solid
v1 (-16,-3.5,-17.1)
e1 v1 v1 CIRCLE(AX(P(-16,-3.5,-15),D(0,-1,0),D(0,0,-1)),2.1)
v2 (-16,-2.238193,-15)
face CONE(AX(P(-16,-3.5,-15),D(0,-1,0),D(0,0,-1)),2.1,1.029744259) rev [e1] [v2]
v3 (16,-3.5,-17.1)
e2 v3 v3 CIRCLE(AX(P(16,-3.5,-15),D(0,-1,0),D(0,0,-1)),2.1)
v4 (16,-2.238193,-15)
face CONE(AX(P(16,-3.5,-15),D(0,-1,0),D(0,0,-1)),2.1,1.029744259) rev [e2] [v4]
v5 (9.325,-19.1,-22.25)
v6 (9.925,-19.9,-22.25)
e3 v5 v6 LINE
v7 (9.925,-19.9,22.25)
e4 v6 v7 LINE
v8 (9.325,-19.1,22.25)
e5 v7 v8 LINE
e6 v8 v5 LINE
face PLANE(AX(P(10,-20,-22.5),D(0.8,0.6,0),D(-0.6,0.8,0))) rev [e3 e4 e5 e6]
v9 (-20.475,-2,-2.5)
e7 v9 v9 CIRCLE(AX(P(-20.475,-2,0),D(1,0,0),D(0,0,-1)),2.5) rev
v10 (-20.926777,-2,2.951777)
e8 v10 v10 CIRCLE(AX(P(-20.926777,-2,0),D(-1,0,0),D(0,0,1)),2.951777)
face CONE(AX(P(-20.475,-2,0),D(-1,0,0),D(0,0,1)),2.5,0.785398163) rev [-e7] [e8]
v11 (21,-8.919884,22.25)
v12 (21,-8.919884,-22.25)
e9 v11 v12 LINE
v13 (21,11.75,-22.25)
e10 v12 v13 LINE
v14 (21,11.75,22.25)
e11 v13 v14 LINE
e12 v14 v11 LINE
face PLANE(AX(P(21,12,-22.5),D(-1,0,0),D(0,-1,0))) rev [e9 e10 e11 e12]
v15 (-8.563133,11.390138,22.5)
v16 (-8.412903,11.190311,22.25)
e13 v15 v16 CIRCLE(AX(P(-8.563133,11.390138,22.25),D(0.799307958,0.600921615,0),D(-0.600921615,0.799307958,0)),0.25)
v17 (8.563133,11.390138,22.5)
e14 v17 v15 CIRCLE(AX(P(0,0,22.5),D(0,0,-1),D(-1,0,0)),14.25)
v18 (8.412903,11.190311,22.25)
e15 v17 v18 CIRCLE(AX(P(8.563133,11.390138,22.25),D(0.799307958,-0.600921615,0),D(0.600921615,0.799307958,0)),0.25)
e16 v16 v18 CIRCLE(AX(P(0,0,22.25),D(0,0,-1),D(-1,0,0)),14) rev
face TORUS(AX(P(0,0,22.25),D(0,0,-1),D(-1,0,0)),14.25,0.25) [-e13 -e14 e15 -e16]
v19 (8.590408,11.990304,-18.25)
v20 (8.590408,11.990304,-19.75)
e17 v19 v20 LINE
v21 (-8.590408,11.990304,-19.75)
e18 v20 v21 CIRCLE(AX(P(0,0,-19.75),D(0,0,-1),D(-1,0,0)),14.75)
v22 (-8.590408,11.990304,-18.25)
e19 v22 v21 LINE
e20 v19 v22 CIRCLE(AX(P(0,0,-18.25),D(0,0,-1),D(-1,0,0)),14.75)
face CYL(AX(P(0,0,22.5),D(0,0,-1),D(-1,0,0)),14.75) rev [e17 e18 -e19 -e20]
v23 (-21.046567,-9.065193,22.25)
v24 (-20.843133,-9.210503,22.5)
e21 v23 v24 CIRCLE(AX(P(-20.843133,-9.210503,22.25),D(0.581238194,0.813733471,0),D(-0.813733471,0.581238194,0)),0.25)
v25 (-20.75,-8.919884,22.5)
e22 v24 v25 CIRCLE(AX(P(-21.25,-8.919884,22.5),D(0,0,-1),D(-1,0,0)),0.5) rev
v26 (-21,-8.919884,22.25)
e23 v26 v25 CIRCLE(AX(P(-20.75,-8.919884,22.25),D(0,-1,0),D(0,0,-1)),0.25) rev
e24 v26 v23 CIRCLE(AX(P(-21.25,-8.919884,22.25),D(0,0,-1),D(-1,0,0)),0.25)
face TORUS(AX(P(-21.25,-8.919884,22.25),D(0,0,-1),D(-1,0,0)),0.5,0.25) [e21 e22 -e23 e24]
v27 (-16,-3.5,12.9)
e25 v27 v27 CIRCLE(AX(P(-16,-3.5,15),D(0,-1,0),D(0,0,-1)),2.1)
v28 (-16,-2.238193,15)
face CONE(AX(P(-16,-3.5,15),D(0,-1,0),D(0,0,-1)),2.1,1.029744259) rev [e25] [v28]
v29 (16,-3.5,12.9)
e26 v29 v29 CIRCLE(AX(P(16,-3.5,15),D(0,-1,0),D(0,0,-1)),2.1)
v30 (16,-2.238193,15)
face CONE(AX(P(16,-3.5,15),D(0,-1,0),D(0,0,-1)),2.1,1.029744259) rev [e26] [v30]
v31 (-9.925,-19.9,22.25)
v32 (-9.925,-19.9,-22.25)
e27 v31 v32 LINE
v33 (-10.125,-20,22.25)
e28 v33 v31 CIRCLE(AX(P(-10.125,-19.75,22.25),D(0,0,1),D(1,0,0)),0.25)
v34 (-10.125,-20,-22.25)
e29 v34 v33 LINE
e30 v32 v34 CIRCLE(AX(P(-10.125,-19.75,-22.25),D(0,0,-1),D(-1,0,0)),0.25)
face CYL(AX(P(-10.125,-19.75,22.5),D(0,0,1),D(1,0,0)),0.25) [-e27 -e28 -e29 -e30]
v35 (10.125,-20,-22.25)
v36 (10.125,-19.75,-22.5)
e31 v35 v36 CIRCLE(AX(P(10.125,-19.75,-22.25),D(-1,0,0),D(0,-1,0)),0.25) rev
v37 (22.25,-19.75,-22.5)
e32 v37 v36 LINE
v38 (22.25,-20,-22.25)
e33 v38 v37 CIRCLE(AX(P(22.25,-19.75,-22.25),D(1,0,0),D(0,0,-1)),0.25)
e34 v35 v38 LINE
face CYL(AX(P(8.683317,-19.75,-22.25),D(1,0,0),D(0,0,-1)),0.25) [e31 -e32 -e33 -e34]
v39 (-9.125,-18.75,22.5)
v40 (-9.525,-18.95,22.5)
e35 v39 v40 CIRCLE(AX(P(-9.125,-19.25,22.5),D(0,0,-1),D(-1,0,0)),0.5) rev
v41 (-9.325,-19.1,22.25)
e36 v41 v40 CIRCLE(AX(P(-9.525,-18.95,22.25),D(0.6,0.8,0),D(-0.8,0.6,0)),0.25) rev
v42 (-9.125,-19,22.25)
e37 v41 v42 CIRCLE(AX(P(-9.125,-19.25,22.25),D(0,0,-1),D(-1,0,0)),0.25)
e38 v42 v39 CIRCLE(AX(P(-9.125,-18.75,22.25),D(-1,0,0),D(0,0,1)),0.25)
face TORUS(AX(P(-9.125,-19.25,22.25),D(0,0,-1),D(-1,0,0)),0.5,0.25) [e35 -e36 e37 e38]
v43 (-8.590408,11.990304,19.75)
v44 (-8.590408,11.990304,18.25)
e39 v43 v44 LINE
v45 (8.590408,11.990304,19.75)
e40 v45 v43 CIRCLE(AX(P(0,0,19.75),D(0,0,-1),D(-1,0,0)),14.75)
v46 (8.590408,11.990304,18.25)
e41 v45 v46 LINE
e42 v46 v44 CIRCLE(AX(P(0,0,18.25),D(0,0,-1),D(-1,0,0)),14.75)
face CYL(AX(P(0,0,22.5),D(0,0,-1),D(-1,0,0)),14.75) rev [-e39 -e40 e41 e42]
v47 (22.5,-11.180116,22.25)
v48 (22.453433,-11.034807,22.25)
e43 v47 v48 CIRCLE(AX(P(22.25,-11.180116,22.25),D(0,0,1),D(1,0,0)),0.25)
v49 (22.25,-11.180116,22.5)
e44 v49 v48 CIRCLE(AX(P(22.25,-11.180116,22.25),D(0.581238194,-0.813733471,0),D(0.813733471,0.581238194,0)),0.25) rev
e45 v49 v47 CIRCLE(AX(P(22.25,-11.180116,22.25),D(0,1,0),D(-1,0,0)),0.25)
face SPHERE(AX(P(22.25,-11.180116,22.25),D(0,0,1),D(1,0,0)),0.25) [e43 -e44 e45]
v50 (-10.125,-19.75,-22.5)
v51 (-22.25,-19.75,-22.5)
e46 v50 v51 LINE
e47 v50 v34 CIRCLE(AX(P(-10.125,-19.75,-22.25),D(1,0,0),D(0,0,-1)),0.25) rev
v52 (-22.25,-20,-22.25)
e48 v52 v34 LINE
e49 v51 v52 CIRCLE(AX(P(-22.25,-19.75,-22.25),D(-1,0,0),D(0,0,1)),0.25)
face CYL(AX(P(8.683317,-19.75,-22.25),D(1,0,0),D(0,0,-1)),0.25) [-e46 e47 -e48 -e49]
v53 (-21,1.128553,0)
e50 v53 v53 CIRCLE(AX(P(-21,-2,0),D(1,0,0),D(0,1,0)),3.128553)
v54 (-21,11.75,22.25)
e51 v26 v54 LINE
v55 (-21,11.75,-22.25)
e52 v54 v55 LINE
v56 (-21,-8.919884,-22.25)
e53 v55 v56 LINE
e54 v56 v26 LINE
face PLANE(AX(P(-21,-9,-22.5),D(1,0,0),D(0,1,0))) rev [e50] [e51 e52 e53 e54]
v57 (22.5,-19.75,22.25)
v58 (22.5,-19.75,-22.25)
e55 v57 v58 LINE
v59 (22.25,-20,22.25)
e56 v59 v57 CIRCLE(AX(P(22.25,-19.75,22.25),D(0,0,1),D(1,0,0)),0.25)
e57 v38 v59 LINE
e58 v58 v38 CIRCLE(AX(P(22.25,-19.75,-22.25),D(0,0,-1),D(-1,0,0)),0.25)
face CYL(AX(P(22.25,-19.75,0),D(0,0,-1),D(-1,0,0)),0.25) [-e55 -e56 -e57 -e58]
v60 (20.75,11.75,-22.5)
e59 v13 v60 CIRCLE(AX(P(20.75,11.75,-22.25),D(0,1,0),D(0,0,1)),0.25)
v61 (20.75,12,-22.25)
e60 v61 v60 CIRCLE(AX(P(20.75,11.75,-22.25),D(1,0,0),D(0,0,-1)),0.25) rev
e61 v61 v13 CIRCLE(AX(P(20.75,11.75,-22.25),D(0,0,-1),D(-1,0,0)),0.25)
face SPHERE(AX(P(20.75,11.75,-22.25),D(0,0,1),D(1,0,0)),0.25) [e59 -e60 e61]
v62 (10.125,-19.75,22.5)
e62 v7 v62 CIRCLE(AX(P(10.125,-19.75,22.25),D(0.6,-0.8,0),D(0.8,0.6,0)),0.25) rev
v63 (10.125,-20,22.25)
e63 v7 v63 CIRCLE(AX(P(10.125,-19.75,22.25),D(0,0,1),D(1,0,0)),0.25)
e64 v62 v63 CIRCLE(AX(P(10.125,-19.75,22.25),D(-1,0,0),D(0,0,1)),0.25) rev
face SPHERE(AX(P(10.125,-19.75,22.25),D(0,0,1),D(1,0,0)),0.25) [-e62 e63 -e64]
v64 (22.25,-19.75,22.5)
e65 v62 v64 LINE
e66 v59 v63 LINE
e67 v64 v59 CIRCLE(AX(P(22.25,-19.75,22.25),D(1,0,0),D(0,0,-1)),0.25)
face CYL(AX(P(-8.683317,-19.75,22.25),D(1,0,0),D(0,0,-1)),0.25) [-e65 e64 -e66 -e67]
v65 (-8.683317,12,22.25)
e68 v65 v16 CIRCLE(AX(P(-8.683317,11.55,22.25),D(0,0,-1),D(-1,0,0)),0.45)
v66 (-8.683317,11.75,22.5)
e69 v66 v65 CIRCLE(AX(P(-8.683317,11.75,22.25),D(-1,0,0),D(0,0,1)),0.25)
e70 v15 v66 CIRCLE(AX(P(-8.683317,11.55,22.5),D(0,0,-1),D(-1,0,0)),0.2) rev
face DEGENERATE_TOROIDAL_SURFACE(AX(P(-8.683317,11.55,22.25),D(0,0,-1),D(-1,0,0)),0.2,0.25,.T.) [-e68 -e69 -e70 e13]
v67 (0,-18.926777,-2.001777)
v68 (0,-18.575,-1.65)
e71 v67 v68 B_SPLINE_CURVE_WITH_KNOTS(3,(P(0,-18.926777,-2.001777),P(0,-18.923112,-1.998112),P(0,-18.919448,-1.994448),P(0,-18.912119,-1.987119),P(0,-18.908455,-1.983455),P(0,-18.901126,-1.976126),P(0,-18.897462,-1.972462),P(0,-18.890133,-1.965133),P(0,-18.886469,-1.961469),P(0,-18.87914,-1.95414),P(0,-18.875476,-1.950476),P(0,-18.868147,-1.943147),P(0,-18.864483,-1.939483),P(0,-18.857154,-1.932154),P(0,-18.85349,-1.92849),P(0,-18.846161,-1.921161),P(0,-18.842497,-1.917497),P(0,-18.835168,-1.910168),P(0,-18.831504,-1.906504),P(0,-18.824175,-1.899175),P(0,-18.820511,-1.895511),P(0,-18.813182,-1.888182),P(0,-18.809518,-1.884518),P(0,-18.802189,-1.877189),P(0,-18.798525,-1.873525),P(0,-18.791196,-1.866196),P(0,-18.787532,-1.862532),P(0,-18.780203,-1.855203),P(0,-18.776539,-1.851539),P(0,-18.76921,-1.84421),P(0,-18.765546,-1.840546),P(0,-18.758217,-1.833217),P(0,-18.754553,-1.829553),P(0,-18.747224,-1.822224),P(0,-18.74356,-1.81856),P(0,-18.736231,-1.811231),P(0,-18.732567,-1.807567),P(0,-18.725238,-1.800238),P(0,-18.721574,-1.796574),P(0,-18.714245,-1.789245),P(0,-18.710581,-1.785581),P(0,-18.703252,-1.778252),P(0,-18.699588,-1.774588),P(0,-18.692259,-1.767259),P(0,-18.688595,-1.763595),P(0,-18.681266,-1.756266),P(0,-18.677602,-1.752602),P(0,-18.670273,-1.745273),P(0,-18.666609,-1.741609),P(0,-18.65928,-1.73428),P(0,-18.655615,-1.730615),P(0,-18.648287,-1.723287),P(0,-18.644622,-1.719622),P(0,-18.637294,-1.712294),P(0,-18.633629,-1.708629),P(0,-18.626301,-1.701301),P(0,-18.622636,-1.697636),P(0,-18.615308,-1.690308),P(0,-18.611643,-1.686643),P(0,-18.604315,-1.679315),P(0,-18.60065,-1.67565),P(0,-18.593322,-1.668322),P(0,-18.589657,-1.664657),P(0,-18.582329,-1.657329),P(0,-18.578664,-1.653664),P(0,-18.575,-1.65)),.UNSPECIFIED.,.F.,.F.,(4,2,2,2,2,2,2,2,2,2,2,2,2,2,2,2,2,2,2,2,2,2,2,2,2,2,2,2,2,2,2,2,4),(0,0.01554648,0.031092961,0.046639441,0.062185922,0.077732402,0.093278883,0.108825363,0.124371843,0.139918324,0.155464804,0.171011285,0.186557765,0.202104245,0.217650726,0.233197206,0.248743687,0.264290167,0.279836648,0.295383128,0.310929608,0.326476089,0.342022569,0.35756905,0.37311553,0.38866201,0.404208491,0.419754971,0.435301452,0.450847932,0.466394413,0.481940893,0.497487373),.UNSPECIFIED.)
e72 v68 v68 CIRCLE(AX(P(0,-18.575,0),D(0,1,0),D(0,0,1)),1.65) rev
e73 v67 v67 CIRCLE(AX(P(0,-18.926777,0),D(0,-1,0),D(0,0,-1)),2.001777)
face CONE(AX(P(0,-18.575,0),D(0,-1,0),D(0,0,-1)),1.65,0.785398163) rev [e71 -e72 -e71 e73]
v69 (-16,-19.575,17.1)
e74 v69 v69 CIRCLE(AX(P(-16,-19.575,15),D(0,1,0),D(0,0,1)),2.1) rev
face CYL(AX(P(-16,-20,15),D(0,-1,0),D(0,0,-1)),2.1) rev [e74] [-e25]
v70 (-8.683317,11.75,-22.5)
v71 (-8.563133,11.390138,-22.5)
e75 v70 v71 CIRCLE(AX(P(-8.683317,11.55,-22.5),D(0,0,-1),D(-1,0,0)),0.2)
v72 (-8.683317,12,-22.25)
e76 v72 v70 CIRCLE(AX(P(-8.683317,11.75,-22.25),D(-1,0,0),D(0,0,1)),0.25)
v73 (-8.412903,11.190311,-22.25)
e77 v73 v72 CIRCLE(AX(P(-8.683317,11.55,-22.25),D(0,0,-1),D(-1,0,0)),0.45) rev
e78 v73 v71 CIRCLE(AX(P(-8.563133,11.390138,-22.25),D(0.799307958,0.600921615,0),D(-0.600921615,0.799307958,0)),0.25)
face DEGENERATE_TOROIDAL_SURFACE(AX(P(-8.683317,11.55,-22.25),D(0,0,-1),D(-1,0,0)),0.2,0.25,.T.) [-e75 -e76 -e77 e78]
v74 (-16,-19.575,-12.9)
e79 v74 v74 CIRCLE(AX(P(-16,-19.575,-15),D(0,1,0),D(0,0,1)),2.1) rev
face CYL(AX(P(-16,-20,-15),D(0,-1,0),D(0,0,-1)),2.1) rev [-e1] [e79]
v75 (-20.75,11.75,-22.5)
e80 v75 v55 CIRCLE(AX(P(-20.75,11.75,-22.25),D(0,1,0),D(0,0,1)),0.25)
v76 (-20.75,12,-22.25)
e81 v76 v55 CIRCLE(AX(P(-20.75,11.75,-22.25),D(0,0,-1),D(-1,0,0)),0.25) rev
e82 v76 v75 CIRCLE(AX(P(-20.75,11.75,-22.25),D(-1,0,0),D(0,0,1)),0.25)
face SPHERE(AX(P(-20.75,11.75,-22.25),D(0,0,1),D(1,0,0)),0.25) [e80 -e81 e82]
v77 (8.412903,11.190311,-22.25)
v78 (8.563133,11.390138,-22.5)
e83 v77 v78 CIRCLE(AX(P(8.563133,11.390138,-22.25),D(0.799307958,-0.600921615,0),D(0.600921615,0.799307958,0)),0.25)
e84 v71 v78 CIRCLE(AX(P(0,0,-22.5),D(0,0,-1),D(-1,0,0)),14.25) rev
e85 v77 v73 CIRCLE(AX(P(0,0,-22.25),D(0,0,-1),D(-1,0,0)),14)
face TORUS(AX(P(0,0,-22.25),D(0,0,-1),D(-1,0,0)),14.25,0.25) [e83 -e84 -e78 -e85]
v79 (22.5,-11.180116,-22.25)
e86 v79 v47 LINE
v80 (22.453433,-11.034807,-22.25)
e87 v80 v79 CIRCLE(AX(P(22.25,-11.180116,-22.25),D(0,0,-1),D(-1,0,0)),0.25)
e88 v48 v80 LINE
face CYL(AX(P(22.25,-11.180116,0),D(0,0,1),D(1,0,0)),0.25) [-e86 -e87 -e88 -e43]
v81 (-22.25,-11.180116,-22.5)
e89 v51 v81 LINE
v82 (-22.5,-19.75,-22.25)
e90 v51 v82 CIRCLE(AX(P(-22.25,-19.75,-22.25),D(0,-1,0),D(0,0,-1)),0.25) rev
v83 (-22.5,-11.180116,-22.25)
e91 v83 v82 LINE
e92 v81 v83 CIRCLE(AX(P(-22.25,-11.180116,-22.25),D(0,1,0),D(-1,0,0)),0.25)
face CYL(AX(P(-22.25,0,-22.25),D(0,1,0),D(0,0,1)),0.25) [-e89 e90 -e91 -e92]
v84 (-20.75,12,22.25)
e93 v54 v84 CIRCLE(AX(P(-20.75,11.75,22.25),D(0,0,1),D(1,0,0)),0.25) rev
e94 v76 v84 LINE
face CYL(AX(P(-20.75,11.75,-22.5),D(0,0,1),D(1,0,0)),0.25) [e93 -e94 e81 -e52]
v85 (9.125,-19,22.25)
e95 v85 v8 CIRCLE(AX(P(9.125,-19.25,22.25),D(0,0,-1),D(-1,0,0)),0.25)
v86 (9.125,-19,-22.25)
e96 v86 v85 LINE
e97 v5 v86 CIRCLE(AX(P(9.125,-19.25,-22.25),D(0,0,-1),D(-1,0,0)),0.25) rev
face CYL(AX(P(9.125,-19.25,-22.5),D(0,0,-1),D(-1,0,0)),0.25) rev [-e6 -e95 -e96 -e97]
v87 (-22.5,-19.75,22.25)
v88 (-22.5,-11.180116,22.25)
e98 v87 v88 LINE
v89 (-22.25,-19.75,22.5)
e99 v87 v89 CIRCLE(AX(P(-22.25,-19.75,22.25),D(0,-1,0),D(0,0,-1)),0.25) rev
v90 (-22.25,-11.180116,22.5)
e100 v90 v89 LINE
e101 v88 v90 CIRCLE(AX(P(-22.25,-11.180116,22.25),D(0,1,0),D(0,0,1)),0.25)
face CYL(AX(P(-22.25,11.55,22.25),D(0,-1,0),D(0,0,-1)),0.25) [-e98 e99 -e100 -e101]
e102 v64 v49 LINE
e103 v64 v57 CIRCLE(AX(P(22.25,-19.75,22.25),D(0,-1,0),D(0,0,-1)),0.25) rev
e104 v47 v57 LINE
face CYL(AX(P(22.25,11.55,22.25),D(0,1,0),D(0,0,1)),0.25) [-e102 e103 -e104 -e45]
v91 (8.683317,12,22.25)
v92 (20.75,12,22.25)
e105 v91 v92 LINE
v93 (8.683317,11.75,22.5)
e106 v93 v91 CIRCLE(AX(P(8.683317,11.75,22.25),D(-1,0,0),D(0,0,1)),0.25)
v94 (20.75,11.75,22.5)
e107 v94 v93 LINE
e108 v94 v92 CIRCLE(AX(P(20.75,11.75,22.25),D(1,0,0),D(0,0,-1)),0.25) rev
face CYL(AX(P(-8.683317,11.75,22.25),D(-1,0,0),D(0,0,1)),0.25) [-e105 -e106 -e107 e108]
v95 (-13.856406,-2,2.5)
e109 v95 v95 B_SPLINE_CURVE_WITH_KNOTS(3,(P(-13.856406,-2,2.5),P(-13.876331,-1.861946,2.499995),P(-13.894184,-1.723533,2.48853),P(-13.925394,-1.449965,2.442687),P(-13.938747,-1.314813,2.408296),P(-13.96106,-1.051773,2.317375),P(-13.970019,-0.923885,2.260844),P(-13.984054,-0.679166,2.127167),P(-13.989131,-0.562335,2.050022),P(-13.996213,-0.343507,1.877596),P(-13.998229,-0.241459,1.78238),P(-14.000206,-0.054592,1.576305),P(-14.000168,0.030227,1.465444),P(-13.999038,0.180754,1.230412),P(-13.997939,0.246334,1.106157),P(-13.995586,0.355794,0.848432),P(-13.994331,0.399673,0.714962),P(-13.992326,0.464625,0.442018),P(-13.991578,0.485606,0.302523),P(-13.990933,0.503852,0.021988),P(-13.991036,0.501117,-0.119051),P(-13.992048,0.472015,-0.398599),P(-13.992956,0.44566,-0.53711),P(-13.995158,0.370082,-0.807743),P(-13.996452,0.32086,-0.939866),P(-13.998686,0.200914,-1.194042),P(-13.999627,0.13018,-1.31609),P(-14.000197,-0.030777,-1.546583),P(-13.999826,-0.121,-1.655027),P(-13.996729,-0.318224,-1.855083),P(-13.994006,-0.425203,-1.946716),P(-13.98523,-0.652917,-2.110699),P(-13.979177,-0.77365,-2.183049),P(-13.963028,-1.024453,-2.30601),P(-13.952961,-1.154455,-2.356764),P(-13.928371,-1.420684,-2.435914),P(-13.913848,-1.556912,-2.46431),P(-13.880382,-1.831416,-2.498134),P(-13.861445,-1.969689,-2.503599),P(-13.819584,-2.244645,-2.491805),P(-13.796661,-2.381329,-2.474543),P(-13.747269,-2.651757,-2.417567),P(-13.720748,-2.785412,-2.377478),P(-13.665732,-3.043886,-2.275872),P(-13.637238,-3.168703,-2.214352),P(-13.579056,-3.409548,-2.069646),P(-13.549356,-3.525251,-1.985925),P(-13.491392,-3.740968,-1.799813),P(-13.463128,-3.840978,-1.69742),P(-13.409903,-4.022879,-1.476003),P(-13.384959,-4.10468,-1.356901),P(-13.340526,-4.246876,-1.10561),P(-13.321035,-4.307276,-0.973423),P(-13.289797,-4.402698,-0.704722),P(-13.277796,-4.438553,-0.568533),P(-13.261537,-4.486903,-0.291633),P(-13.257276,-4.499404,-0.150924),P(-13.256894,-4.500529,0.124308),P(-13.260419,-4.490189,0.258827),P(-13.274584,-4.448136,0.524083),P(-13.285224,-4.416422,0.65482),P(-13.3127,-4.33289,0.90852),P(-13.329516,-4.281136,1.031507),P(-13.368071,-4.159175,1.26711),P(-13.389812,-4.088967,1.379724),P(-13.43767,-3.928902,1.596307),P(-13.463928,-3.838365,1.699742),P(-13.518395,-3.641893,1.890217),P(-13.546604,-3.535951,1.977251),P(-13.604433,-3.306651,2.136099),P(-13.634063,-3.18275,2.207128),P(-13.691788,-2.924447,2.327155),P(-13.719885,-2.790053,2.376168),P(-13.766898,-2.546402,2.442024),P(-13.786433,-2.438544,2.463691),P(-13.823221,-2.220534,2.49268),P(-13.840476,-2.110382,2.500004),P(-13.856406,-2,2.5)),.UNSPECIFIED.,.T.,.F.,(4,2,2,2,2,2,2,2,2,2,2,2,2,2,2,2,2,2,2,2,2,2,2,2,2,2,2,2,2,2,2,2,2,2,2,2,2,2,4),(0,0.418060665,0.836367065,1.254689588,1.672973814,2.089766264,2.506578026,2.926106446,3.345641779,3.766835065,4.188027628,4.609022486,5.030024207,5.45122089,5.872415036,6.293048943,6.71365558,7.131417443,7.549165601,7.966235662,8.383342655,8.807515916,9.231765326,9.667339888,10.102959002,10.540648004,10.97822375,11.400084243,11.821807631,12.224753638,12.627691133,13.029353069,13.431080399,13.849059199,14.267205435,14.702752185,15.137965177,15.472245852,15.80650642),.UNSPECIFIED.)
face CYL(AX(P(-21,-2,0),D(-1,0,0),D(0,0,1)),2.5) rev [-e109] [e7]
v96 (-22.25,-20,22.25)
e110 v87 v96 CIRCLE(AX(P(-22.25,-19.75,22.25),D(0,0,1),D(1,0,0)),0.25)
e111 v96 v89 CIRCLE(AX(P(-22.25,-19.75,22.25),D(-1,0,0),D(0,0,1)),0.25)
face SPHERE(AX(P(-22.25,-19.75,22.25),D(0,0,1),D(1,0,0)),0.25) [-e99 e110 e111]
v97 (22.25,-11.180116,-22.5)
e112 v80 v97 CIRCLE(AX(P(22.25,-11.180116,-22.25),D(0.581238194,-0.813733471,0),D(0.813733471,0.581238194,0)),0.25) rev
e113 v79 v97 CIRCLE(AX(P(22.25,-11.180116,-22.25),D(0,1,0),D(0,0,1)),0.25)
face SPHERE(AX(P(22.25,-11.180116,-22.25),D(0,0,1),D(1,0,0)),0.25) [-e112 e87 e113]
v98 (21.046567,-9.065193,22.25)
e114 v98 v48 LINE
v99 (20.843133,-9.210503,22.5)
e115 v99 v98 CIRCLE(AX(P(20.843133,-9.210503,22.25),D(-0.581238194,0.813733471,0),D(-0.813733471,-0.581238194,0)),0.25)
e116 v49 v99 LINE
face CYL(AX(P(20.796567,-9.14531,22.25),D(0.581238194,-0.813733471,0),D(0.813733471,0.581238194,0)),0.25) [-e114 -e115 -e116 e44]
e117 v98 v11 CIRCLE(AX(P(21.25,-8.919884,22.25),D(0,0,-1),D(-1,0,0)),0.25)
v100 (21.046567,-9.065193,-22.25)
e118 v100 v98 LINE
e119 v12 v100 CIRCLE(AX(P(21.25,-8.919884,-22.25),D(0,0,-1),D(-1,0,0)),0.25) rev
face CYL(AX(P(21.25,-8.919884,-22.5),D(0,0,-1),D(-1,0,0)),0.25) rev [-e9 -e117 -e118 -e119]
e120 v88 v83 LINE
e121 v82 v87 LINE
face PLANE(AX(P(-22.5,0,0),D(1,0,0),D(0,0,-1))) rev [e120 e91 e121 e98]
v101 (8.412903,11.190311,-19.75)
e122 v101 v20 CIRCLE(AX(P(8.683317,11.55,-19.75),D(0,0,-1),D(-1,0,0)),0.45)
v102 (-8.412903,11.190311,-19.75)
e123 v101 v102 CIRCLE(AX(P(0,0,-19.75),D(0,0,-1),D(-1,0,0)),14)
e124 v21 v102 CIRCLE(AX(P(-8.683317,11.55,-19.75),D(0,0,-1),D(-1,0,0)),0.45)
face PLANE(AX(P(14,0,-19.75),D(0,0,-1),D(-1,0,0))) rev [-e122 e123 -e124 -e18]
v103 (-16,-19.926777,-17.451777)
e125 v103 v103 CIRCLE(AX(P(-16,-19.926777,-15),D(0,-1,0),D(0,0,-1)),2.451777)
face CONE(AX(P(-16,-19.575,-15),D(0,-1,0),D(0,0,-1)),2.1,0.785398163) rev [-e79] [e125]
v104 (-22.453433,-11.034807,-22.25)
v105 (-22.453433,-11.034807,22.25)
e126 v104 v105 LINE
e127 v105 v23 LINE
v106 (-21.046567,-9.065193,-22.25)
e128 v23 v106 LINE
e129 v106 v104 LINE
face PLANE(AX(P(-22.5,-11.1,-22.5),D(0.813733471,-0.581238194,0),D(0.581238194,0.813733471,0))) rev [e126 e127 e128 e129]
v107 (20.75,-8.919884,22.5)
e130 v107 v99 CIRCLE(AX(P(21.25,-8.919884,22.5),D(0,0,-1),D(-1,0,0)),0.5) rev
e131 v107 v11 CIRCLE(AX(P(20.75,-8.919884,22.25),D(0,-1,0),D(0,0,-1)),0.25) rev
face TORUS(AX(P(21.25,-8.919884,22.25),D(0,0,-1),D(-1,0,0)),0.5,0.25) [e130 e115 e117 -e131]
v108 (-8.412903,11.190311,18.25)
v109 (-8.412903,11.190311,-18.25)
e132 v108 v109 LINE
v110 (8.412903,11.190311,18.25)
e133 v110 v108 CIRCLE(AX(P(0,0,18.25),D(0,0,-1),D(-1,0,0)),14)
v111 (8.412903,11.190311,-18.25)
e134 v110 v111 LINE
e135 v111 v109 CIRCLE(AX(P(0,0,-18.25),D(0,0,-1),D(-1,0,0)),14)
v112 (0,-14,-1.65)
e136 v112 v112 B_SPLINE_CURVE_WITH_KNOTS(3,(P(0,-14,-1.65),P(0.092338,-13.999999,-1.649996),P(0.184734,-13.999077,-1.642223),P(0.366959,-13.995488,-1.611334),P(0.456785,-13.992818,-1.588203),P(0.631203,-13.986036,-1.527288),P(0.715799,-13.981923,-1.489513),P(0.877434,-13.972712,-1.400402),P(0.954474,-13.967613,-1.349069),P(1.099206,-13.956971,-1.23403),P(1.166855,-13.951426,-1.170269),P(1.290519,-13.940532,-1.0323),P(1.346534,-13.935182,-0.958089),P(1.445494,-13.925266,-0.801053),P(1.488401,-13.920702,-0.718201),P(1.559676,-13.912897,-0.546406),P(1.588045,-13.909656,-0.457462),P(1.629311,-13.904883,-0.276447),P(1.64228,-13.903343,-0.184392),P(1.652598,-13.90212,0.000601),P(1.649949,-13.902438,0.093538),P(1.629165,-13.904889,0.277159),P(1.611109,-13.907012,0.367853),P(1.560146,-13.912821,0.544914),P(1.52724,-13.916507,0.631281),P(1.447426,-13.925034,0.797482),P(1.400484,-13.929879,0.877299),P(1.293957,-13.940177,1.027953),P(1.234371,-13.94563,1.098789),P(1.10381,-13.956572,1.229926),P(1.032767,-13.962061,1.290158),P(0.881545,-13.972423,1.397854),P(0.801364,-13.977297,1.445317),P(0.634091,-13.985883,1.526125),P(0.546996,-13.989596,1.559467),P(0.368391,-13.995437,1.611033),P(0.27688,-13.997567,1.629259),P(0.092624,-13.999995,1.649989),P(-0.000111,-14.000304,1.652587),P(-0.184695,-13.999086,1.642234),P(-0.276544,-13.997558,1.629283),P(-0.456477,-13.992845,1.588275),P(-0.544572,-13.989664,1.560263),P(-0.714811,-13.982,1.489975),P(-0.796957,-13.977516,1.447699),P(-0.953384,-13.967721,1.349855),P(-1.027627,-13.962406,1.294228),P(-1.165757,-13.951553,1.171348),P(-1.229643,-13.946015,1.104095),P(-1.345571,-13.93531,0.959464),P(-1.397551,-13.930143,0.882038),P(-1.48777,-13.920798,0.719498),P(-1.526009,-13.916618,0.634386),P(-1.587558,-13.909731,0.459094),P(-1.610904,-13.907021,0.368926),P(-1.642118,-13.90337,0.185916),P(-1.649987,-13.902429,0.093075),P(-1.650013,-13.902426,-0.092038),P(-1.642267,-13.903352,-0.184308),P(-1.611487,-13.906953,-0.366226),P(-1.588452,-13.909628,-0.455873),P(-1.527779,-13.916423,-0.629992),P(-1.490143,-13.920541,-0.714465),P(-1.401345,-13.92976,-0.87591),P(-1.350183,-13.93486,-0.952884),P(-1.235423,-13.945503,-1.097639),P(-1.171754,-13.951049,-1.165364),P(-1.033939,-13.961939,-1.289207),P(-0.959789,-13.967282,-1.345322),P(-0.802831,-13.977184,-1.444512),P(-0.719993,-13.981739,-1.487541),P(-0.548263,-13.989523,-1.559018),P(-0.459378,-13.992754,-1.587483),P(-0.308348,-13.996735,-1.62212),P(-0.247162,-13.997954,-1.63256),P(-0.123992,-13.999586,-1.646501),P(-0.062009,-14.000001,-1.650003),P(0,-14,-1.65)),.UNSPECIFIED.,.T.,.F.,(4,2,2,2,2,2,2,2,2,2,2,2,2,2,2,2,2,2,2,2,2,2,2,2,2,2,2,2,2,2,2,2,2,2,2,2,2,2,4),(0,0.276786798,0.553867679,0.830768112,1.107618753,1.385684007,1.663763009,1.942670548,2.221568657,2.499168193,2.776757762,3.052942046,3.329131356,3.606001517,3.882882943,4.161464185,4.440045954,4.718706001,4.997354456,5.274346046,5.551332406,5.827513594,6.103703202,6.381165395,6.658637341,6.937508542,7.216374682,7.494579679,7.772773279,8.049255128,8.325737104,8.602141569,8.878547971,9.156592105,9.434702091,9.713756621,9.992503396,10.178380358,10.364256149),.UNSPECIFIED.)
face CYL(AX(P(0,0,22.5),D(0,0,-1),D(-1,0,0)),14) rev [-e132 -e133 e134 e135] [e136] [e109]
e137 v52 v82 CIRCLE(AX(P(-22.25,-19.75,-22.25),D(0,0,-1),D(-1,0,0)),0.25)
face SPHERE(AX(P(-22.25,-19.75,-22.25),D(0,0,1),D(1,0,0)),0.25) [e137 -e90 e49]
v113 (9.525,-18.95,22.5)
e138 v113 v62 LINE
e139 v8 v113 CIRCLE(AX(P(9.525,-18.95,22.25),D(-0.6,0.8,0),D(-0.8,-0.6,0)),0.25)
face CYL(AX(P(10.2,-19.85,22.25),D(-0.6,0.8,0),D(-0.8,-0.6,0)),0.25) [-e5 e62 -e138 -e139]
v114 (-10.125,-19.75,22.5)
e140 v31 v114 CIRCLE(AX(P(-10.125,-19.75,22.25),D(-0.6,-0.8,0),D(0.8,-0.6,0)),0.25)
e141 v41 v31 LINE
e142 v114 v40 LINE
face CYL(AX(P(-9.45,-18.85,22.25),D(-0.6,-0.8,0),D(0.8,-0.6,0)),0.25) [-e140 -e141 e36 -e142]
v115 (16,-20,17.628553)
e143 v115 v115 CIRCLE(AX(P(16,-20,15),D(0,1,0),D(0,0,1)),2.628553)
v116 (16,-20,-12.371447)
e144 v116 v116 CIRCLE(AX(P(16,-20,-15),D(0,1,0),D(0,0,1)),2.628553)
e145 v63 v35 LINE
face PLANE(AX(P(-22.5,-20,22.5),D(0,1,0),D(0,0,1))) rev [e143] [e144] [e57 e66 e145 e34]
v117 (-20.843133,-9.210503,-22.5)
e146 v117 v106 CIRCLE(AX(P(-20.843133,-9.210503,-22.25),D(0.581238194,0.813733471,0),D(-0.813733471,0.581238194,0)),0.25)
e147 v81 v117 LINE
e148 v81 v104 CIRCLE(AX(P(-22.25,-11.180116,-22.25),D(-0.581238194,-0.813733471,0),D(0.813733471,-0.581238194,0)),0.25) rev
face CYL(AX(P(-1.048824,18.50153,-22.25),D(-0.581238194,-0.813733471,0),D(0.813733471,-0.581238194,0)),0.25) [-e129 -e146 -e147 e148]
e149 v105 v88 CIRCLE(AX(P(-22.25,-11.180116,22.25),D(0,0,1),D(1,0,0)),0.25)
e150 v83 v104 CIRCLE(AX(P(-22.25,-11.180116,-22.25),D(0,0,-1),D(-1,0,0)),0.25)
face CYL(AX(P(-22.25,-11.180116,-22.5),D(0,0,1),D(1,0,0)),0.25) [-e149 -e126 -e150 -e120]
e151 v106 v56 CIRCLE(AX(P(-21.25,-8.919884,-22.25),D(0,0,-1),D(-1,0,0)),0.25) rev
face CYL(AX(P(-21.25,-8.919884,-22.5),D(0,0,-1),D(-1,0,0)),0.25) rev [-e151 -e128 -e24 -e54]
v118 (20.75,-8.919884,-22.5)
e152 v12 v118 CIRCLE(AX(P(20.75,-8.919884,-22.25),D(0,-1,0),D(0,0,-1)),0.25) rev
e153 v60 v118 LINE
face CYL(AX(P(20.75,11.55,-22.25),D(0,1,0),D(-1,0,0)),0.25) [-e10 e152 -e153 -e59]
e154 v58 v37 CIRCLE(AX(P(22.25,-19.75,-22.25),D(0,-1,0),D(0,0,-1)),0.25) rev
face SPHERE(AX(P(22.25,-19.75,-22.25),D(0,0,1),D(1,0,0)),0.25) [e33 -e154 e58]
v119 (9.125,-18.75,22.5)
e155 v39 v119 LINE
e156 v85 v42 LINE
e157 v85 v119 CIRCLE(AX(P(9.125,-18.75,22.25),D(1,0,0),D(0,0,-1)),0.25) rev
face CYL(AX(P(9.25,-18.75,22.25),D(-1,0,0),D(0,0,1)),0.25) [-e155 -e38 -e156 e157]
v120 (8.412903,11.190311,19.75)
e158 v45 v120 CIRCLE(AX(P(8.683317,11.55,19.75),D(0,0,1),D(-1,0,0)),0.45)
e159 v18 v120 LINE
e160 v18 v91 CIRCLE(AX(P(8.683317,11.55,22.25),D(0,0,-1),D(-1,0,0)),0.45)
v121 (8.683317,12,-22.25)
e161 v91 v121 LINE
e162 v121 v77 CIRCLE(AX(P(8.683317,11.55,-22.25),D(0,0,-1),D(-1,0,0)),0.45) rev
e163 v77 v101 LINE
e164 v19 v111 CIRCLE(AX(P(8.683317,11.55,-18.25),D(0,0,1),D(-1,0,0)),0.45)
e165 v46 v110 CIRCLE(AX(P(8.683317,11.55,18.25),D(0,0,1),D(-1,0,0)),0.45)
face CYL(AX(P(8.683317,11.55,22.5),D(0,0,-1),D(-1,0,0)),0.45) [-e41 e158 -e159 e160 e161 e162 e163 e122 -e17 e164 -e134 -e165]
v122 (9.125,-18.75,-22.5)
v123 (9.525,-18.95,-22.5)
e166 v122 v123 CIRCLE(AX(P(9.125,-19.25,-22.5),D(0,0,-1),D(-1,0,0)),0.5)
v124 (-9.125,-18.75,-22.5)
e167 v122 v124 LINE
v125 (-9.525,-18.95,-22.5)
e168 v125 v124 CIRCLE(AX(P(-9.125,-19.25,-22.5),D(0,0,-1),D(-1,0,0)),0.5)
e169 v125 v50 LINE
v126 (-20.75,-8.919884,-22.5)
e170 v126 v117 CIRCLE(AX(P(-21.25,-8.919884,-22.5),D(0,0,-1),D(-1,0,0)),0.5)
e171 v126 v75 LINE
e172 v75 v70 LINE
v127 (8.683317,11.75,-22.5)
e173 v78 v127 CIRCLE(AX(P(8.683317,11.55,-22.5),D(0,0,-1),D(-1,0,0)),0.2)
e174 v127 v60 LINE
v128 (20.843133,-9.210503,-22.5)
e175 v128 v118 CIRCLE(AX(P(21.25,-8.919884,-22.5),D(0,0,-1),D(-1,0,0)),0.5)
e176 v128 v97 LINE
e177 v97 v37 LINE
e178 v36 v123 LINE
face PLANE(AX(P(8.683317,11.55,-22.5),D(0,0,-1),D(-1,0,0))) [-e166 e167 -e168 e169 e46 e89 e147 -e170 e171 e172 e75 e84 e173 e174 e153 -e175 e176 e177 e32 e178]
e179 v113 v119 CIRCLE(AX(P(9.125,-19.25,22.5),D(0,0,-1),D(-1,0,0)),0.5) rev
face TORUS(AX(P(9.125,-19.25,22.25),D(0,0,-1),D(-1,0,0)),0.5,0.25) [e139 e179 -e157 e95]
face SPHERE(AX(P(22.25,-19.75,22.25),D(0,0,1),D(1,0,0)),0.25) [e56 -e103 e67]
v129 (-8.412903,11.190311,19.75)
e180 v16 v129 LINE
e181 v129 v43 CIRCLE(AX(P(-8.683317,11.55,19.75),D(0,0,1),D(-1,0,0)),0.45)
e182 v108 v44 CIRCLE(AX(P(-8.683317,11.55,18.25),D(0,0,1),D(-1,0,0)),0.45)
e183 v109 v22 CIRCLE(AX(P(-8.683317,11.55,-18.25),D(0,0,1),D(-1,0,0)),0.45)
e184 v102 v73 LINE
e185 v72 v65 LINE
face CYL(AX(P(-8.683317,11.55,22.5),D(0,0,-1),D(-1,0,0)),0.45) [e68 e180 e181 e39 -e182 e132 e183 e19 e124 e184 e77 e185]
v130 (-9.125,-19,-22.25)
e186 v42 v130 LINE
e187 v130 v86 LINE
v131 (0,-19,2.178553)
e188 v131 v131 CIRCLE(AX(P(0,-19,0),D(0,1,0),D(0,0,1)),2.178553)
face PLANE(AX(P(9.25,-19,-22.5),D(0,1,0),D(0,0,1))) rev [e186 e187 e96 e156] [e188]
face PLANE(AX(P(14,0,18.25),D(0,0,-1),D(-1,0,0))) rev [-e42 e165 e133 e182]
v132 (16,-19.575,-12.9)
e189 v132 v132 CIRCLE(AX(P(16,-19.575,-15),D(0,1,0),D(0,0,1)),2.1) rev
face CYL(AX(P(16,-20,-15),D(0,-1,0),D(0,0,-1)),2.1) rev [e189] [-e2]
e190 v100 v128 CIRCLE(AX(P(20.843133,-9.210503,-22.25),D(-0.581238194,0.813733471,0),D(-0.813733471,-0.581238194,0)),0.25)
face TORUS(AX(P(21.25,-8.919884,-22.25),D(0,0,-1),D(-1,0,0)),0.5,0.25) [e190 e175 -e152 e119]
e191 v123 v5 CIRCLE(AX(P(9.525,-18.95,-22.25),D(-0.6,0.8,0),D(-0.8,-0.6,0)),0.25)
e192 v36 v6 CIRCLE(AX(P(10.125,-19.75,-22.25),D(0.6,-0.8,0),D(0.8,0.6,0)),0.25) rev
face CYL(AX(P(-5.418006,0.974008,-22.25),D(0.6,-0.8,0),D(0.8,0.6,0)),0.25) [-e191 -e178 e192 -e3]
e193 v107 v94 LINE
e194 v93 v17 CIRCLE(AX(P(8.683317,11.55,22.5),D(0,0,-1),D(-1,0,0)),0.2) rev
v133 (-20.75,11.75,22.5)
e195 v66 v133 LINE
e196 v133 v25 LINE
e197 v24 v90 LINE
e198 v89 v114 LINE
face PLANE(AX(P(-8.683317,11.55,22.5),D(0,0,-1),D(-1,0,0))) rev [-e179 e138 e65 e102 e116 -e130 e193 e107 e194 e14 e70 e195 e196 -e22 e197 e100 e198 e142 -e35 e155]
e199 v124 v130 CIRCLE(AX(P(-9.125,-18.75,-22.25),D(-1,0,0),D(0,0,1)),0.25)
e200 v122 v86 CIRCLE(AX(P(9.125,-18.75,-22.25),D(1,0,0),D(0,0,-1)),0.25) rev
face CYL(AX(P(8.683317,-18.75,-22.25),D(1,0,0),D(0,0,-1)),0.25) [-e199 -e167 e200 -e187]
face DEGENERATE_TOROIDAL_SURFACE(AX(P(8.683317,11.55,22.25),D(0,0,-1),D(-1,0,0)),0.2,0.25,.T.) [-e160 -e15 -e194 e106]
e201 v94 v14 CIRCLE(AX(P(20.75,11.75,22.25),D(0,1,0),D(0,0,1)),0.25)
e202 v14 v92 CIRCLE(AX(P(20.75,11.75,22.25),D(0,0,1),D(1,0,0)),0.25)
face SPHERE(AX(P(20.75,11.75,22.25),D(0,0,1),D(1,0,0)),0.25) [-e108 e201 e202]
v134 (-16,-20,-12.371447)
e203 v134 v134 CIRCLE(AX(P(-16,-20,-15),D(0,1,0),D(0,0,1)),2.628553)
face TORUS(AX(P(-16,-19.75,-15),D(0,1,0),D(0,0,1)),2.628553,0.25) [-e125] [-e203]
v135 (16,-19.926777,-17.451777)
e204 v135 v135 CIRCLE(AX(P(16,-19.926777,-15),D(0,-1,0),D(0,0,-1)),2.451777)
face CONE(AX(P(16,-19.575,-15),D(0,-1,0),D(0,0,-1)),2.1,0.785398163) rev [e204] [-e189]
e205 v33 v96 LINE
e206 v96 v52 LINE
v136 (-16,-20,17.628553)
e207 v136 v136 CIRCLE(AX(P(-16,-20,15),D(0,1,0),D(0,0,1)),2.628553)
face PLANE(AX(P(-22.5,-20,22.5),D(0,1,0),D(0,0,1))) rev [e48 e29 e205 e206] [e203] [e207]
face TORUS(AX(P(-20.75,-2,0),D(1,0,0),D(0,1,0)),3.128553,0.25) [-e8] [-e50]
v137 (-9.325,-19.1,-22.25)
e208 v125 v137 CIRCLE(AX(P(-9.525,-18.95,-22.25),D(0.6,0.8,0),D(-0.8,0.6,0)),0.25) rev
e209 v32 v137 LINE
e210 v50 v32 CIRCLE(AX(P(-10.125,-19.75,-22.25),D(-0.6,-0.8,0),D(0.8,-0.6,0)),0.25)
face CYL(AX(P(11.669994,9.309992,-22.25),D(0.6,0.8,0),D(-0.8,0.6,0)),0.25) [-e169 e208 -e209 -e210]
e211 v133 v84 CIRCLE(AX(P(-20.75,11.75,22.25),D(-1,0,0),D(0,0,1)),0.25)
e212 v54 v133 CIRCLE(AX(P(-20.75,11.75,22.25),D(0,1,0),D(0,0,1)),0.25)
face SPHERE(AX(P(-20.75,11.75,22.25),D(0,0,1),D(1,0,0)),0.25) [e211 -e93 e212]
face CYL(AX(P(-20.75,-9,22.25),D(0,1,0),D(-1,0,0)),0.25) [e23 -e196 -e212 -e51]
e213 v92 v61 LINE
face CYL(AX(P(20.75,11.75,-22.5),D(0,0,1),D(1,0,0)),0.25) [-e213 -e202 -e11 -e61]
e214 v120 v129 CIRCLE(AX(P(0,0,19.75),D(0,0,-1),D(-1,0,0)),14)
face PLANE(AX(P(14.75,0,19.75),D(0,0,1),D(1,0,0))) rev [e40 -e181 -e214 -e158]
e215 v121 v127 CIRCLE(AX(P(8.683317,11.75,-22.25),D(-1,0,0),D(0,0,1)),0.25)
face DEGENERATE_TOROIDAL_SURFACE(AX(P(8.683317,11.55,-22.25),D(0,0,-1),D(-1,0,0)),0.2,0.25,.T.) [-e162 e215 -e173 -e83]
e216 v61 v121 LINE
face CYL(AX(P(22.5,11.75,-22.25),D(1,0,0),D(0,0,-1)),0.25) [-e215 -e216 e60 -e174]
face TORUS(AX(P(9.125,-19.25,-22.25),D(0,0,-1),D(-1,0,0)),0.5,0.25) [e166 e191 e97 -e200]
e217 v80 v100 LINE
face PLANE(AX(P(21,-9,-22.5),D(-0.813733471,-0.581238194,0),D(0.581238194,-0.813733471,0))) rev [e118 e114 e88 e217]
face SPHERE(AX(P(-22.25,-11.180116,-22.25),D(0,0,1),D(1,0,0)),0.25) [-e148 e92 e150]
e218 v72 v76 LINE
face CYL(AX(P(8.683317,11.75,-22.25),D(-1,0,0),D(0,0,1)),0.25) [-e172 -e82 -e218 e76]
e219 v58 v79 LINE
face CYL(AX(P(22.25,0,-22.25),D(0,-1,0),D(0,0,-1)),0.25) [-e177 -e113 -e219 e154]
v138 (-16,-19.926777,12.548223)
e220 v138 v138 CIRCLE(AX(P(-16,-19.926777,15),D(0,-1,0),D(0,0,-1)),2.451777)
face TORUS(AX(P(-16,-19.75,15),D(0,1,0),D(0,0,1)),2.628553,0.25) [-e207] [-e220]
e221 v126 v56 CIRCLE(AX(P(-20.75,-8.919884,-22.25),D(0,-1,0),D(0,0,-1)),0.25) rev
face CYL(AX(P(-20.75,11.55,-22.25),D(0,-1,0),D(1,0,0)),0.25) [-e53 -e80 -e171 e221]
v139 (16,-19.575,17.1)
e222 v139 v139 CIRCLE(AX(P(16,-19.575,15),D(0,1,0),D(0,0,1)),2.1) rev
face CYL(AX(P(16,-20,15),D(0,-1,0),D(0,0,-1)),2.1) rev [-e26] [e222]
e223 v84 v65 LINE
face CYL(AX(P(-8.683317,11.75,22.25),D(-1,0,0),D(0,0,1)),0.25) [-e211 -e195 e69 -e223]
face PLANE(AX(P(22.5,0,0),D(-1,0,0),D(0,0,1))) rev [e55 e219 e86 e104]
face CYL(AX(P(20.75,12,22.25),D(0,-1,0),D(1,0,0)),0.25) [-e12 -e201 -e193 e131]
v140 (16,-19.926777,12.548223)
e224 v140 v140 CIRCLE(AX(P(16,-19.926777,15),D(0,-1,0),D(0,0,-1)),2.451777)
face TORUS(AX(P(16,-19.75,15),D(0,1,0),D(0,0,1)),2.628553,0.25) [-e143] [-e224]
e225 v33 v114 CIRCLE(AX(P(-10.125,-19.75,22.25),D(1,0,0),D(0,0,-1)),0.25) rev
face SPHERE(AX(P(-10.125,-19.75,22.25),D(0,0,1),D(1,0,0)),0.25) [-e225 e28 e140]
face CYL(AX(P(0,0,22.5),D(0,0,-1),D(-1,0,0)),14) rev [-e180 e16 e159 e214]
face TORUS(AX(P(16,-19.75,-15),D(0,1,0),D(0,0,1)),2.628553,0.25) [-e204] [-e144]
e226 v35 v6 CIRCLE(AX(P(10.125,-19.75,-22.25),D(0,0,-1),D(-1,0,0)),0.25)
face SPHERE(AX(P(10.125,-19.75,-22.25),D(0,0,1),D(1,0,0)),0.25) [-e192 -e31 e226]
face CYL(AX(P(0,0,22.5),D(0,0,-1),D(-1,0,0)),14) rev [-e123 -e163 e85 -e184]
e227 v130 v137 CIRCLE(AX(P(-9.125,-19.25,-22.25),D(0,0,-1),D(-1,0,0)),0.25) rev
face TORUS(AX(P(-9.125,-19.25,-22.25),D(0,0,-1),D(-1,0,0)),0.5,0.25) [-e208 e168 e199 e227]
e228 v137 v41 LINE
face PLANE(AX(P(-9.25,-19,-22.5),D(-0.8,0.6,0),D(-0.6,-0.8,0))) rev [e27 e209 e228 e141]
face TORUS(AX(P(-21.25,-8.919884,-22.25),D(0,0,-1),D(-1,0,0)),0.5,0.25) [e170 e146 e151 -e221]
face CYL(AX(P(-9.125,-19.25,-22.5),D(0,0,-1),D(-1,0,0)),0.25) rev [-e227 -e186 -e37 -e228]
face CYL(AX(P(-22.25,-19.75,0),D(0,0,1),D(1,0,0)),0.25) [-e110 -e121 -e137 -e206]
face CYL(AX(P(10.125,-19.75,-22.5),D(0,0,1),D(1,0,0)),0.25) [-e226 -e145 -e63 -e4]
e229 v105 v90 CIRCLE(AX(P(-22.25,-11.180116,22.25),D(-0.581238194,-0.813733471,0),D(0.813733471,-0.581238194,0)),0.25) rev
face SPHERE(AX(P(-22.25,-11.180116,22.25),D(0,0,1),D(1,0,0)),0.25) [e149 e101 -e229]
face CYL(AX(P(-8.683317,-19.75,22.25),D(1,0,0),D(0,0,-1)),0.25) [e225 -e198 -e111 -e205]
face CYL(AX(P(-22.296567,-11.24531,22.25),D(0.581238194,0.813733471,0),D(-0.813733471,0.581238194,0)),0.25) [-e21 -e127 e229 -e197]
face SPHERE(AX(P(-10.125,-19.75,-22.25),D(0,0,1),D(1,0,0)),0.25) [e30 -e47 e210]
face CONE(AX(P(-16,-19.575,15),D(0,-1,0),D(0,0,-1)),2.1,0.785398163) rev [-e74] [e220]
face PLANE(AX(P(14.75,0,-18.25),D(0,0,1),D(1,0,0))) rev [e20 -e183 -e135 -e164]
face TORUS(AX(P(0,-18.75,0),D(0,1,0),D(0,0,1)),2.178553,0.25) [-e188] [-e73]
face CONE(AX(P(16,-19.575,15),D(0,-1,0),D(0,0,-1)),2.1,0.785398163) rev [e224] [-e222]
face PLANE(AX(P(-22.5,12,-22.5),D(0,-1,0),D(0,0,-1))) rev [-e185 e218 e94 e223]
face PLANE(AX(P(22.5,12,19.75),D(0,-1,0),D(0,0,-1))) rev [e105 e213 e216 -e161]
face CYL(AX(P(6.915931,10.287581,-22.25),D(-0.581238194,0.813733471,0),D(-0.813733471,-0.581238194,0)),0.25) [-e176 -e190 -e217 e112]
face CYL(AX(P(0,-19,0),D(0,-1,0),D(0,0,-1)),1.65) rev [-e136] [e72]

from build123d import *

# Parameters (mm, degrees)
EXTRUDE_START               = -2.75
EXTRUDE_1_DEPTH             = 4.25
EXTRUDE_1_2_DEPTH           = 1.5
EXTRUDE_2_DEPTH             = 36.5
EXTRUDE_3_DEPTH             = 1.5
SKETCH_4_W                  = 42.25
SKETCH_4_H                  = 32
EXTRUDE_4_DEPTH             = 13.816682662
SKETCH_5_W                  = 42.25
SKETCH_5_H                  = 32
EXTRUDE_5_DEPTH             = 13.816682662
EXTRUDE_6_DEPTH             = 2.75
CUT_EXTRUDE_1_DEPTH         = 55.141019569
CUT_EXTRUDE_2_DEPTH         = 55.141019569
CUT_EXTRUDE_3_DEPTH         = 55.141019569
HOLE_WIZARD_5_0_5_1_REACH   = 54.901
HOLE_WIZARD_5_0_5_1_BORE_R  = 2.5
HOLE_WIZARD_3_3_3_3_1_D     = 3.3
HOLE_WIZARD_3_3_3_3_1_DEPTH = 31
HOLE_WIZARD_4_2_4_2_1_D     = 4.2
HOLE_WIZARD_4_2_4_2_1_DEPTH = 16.5
HOLE_WIZARD_4_2_4_2_1_TIP   = 1.2618073
CHAMFER_1_SIZE              = 0.525
CHAMFER_2_SIZE              = 0.425
FILLET_1_R                  = 0.25


with BuildPart() as part:
    # Бобышка-Вытянуть1: read off the stored shape, not the designer's step
    # Бобышка-Вытянуть1 outline → Бобышка-Вытянуть1 (new body)
    with BuildSketch(Plane.XY.offset(-19.75).offset(EXTRUDE_START)):
        with BuildLine():
            Line((-8.683317338, -20), (8.683317338, -20))
            Line((8.683317338, -20), (8.683317338, 12))
            ThreePointArc((8.683317338, 12), (8.256491928, 11.69254848), (8.412902612, 11.190311419))
            ThreePointArc((8.412902612, 11.190311419), (0, 14), (-8.412902612, 11.190311419))
            ThreePointArc((-8.412902612, 11.190311419), (-8.256491928, 11.69254848), (-8.683317338, 12))
            Line((-8.683317338, 12), (-8.683317338, -20))
        make_face()
    extrude(amount=EXTRUDE_1_DEPTH)

    # Extrude 1 2 outline → Extrude 1 2 (add)
    with BuildSketch(Plane.XY.offset(-19.75)):
        with BuildLine():
            ThreePointArc((8.412902612, 11.190311419), (8.244001661, 11.647476849), (8.59040772, 11.990304216))
            ThreePointArc((8.59040772, 11.990304216), (0, 14.75), (-8.59040772, 11.990304216))
            ThreePointArc((-8.59040772, 11.990304216), (-8.244001661, 11.647476849), (-8.412902612, 11.190311419))
            ThreePointArc((-8.412902612, 11.190311419), (0, 14), (8.412902612, 11.190311419))
        make_face()
    extrude(amount=EXTRUDE_1_2_DEPTH)

    # Эскиз2 → Бобышка-Вытянуть2 (add)
    with BuildSketch(Plane.XY.offset(-18.25)):
        with BuildLine():
            Line((8.683317338, 12), (8.683317338, -20))
            Line((8.683317338, -20), (-8.683317338, -20))
            Line((-8.683317338, -20), (-8.683317338, 12))
            ThreePointArc((-8.683317338, 12), (-8.256491928, 11.69254848), (-8.412902612, 11.190311419))
            ThreePointArc((-8.412902612, 11.190311419), (0, 14), (8.412902612, 11.190311419))
            ThreePointArc((8.412902612, 11.190311419), (8.256491928, 11.69254848), (8.683317338, 12))
        make_face()
    extrude(amount=EXTRUDE_2_DEPTH)

    # Эскиз3 → Бобышка-Вытянуть3 (add)
    with BuildSketch(Plane.XY.offset(18.25)):
        with BuildLine():
            Line((8.683317338, 12), (8.683317338, -20))
            Line((8.683317338, -20), (-8.683317338, -20))
            Line((-8.683317338, -20), (-8.683317338, 12))
            ThreePointArc((-8.683317338, 12), (-8.636610258, 11.99756949), (-8.59040772, 11.990304216))
            ThreePointArc((-8.59040772, 11.990304216), (0, 14.75), (8.59040772, 11.990304216))
            ThreePointArc((8.59040772, 11.990304216), (8.636610258, 11.99756949), (8.683317338, 12))
        make_face()
    extrude(amount=EXTRUDE_3_DEPTH)

    # Эскиз4 → Бобышка-Вытянуть4 (add)
    with BuildSketch(Plane(origin=(8.683317338, 0, 0), x_dir=(0, 0, -1), z_dir=(1, 0, 0))):
        with Locations((1.375, -4)):
            Rectangle(SKETCH_4_W, SKETCH_4_H)
    extrude(amount=EXTRUDE_4_DEPTH)

    # Эскиз5 → Бобышка-Вытянуть5 (add)
    with BuildSketch(Plane.ZY.offset(8.683317338)):
        with Locations((-1.375, -4)):
            Rectangle(SKETCH_5_W, SKETCH_5_H)
    extrude(amount=EXTRUDE_5_DEPTH)

    # Эскиз6 → Бобышка-Вытянуть6 (add)
    with BuildSketch(Plane.XY.offset(19.75)):
        with BuildLine():
            Line((22.5, -20), (-22.5, -20))
            Line((-22.5, -20), (-22.5, 12))
            Line((-22.5, 12), (-8.683317338, 12))
            ThreePointArc((-8.683317338, 12), (-8.256491928, 11.69254848), (-8.412902612, 11.190311419))
            ThreePointArc((-8.412902612, 11.190311419), (0, 14), (8.412902612, 11.190311419))
            ThreePointArc((8.412902612, 11.190311419), (8.256491928, 11.69254848), (8.683317338, 12))
            Line((8.683317338, 12), (22.5, 12))
            Line((22.5, 12), (22.5, -20))
        make_face()
    extrude(amount=EXTRUDE_6_DEPTH)

    # Эскиз7 → Вырез-Вытянуть1 (cut, through all)
    with BuildSketch(Plane.XY.offset(22.5)):
        Polygon((10, -20), (9.25, -19), (-9.25, -19), (-10, -20), align=None)
    extrude(amount=-CUT_EXTRUDE_1_DEPTH, mode=Mode.SUBTRACT)

    # Эскиз8 → Вырез-Вытянуть2 (cut, through all)
    with BuildSketch(Plane.XY.offset(22.5)):
        Polygon((-22.5, -11.1), (-21, -9), (-21, 12), (-22.5, 12), align=None)
    extrude(amount=-CUT_EXTRUDE_2_DEPTH, mode=Mode.SUBTRACT)

    # Эскиз9 → Вырез-Вытянуть3 (cut, through all)
    with BuildSketch(Plane.XY.offset(22.5)):
        Polygon((21, -9), (22.5, -11.1), (22.5, 12), (21, 12), align=None)
    extrude(amount=-CUT_EXTRUDE_3_DEPTH, mode=Mode.SUBTRACT)

    # Эскиз10 → Вырез-Повернуть1 (revolve, cut)
    with BuildSketch(Plane.XZ):
        Polygon((14, 22.5), (0, 22.5), (0, -22.5), (14, -22.5), (14, -19.75), (14.75, -19.75), (14.75, -18.25), (14, -18.25), (14, 18.25), (14.75, 18.25), (14.75, 19.75), (14, 19.75), align=None)
    revolve(axis=Axis((0, 0, 22.5), (0, 0, -1)), mode=Mode.SUBTRACT)

    # Диаметр отверстия Ø5.0 (5)1 bore → Диаметр отверстия Ø5.0 (5)1 (cut, up to next)
    with BuildSketch(Plane.ZY.offset(21), mode=Mode.PRIVATE) as hole_wizard_5_0_5_1_sk1:
        with Locations((0, -2)):
            Circle(HOLE_WIZARD_5_0_5_1_BORE_R)
    hole_wizard_5_0_5_1_tool1 = extrude(hole_wizard_5_0_5_1_sk1.sketch, amount=-HOLE_WIZARD_5_0_5_1_REACH, mode=Mode.PRIVATE) & part.part
    add(hole_wizard_5_0_5_1_tool1.solids().sort_by_distance((-21, -2, 0))[0], mode=Mode.SUBTRACT)

    # Диаметр отверстия Ø3.3 (3.3)1
    with Locations(Plane(origin=(0, -19, 0), x_dir=(-1, 0, 0), z_dir=(0, -1, 0))):
        with Locations((0, 0)):
            Hole(HOLE_WIZARD_3_3_3_3_1_D / 2, depth=HOLE_WIZARD_3_3_3_3_1_DEPTH)

    # Диаметр отверстия Ø4.2 (4.2)1
    with Locations(Plane(origin=(0, -20, 0), x_dir=(-1, 0, 0), z_dir=(0, -1, 0))):
        with Locations((-16, 15), (-16, -15), (16, -15), (16, 15)):
            Hole(HOLE_WIZARD_4_2_4_2_1_D / 2, depth=HOLE_WIZARD_4_2_4_2_1_DEPTH)
            with Locations((0, 0, -(HOLE_WIZARD_4_2_4_2_1_DEPTH + HOLE_WIZARD_4_2_4_2_1_TIP / 2))):  # 118° drill point
                Cone(0, HOLE_WIZARD_4_2_4_2_1_D / 2, HOLE_WIZARD_4_2_4_2_1_TIP, mode=Mode.SUBTRACT)

    # Фаска1
    chamfer_1_edges = [part.edges().sort_by_distance(p)[0] for p in [
        (-21, -2, -2.5),
    ]]
    chamfer(chamfer_1_edges, length=CHAMFER_1_SIZE)

    # Фаска2
    chamfer_2_edges = [part.edges().sort_by_distance(p)[0] for p in [
        (-1.65, -19, 0),
        (-18.1, -20, -15),
        (-18.1, -20, 15),
        (13.9, -20, 15),
        (13.9, -20, -15),
    ]]
    chamfer(chamfer_2_edges, length=CHAMFER_2_SIZE)

    # Скругление1
    fillet_1_edges = [part.edges().sort_by_distance(p)[0] for p in [
        (16.25, -20, -22.5),
        (22.5, -20, 0),
        (22.5, -15.55, -22.5),
        (-22.5, -20, 0),
        (22.5, -15.55, 22.5),
        (8.256491928, 11.69254848, 22.5),
        (-8.256491928, 11.69254848, 22.5),
        (-14.841658669, 12, 22.5),
        (-16.25, -20, 22.5),
        (16.25, -20, 22.5),
        (-16.25, -20, -22.5),
        (10, -20, 0),
        (-9.625, -19.5, -22.5),
        (-10, -20, 0),
        (0, -19, -22.5),
        (-9.25, -19, 0),
        (9.625, -19.5, -22.5),
        (9.25, -19, 0),
        (9.625, -19.5, 22.5),
        (0, -19, 22.5),
        (-9.625, -19.5, 22.5),
        (-22.5, -15.55, 22.5),
        (-22.5, -15.55, -22.5),
        (-14.841658669, 12, -22.5),
        (-22.5, -11.1, 0),
        (-21, 1.5, -22.5),
        (-21, 12, 0),
        (-21.75, -10.05, -22.5),
        (-21, -9, 0),
        (-21.75, -10.05, 22.5),
        (-21, 1.5, 22.5),
        (14.841658669, 12, 22.5),
        (14.841658669, 12, -22.5),
        (21, 1.5, -22.5),
        (21, -9, 0),
        (21, 12, 0),
        (21.75, -10.05, -22.5),
        (22.5, -11.1, 0),
        (21, 1.5, 22.5),
        (21.75, -10.05, 22.5),
        (0, -14, 22.5),
        (0, -14, -22.5),
        (-21, -2, -3.025),
        (13.475, -20, 15),
        (13.475, -20, -15),
        (-18.525, -20, -15),
        (-18.525, -20, 15),
        (-2.075, -19, 0),
        (-8.256491928, 11.69254848, -22.5),
        (8.256491928, 11.69254848, -22.5),
    ]]
    fillet(fillet_1_edges, radius=FILLET_1_R)


solid = part.part
